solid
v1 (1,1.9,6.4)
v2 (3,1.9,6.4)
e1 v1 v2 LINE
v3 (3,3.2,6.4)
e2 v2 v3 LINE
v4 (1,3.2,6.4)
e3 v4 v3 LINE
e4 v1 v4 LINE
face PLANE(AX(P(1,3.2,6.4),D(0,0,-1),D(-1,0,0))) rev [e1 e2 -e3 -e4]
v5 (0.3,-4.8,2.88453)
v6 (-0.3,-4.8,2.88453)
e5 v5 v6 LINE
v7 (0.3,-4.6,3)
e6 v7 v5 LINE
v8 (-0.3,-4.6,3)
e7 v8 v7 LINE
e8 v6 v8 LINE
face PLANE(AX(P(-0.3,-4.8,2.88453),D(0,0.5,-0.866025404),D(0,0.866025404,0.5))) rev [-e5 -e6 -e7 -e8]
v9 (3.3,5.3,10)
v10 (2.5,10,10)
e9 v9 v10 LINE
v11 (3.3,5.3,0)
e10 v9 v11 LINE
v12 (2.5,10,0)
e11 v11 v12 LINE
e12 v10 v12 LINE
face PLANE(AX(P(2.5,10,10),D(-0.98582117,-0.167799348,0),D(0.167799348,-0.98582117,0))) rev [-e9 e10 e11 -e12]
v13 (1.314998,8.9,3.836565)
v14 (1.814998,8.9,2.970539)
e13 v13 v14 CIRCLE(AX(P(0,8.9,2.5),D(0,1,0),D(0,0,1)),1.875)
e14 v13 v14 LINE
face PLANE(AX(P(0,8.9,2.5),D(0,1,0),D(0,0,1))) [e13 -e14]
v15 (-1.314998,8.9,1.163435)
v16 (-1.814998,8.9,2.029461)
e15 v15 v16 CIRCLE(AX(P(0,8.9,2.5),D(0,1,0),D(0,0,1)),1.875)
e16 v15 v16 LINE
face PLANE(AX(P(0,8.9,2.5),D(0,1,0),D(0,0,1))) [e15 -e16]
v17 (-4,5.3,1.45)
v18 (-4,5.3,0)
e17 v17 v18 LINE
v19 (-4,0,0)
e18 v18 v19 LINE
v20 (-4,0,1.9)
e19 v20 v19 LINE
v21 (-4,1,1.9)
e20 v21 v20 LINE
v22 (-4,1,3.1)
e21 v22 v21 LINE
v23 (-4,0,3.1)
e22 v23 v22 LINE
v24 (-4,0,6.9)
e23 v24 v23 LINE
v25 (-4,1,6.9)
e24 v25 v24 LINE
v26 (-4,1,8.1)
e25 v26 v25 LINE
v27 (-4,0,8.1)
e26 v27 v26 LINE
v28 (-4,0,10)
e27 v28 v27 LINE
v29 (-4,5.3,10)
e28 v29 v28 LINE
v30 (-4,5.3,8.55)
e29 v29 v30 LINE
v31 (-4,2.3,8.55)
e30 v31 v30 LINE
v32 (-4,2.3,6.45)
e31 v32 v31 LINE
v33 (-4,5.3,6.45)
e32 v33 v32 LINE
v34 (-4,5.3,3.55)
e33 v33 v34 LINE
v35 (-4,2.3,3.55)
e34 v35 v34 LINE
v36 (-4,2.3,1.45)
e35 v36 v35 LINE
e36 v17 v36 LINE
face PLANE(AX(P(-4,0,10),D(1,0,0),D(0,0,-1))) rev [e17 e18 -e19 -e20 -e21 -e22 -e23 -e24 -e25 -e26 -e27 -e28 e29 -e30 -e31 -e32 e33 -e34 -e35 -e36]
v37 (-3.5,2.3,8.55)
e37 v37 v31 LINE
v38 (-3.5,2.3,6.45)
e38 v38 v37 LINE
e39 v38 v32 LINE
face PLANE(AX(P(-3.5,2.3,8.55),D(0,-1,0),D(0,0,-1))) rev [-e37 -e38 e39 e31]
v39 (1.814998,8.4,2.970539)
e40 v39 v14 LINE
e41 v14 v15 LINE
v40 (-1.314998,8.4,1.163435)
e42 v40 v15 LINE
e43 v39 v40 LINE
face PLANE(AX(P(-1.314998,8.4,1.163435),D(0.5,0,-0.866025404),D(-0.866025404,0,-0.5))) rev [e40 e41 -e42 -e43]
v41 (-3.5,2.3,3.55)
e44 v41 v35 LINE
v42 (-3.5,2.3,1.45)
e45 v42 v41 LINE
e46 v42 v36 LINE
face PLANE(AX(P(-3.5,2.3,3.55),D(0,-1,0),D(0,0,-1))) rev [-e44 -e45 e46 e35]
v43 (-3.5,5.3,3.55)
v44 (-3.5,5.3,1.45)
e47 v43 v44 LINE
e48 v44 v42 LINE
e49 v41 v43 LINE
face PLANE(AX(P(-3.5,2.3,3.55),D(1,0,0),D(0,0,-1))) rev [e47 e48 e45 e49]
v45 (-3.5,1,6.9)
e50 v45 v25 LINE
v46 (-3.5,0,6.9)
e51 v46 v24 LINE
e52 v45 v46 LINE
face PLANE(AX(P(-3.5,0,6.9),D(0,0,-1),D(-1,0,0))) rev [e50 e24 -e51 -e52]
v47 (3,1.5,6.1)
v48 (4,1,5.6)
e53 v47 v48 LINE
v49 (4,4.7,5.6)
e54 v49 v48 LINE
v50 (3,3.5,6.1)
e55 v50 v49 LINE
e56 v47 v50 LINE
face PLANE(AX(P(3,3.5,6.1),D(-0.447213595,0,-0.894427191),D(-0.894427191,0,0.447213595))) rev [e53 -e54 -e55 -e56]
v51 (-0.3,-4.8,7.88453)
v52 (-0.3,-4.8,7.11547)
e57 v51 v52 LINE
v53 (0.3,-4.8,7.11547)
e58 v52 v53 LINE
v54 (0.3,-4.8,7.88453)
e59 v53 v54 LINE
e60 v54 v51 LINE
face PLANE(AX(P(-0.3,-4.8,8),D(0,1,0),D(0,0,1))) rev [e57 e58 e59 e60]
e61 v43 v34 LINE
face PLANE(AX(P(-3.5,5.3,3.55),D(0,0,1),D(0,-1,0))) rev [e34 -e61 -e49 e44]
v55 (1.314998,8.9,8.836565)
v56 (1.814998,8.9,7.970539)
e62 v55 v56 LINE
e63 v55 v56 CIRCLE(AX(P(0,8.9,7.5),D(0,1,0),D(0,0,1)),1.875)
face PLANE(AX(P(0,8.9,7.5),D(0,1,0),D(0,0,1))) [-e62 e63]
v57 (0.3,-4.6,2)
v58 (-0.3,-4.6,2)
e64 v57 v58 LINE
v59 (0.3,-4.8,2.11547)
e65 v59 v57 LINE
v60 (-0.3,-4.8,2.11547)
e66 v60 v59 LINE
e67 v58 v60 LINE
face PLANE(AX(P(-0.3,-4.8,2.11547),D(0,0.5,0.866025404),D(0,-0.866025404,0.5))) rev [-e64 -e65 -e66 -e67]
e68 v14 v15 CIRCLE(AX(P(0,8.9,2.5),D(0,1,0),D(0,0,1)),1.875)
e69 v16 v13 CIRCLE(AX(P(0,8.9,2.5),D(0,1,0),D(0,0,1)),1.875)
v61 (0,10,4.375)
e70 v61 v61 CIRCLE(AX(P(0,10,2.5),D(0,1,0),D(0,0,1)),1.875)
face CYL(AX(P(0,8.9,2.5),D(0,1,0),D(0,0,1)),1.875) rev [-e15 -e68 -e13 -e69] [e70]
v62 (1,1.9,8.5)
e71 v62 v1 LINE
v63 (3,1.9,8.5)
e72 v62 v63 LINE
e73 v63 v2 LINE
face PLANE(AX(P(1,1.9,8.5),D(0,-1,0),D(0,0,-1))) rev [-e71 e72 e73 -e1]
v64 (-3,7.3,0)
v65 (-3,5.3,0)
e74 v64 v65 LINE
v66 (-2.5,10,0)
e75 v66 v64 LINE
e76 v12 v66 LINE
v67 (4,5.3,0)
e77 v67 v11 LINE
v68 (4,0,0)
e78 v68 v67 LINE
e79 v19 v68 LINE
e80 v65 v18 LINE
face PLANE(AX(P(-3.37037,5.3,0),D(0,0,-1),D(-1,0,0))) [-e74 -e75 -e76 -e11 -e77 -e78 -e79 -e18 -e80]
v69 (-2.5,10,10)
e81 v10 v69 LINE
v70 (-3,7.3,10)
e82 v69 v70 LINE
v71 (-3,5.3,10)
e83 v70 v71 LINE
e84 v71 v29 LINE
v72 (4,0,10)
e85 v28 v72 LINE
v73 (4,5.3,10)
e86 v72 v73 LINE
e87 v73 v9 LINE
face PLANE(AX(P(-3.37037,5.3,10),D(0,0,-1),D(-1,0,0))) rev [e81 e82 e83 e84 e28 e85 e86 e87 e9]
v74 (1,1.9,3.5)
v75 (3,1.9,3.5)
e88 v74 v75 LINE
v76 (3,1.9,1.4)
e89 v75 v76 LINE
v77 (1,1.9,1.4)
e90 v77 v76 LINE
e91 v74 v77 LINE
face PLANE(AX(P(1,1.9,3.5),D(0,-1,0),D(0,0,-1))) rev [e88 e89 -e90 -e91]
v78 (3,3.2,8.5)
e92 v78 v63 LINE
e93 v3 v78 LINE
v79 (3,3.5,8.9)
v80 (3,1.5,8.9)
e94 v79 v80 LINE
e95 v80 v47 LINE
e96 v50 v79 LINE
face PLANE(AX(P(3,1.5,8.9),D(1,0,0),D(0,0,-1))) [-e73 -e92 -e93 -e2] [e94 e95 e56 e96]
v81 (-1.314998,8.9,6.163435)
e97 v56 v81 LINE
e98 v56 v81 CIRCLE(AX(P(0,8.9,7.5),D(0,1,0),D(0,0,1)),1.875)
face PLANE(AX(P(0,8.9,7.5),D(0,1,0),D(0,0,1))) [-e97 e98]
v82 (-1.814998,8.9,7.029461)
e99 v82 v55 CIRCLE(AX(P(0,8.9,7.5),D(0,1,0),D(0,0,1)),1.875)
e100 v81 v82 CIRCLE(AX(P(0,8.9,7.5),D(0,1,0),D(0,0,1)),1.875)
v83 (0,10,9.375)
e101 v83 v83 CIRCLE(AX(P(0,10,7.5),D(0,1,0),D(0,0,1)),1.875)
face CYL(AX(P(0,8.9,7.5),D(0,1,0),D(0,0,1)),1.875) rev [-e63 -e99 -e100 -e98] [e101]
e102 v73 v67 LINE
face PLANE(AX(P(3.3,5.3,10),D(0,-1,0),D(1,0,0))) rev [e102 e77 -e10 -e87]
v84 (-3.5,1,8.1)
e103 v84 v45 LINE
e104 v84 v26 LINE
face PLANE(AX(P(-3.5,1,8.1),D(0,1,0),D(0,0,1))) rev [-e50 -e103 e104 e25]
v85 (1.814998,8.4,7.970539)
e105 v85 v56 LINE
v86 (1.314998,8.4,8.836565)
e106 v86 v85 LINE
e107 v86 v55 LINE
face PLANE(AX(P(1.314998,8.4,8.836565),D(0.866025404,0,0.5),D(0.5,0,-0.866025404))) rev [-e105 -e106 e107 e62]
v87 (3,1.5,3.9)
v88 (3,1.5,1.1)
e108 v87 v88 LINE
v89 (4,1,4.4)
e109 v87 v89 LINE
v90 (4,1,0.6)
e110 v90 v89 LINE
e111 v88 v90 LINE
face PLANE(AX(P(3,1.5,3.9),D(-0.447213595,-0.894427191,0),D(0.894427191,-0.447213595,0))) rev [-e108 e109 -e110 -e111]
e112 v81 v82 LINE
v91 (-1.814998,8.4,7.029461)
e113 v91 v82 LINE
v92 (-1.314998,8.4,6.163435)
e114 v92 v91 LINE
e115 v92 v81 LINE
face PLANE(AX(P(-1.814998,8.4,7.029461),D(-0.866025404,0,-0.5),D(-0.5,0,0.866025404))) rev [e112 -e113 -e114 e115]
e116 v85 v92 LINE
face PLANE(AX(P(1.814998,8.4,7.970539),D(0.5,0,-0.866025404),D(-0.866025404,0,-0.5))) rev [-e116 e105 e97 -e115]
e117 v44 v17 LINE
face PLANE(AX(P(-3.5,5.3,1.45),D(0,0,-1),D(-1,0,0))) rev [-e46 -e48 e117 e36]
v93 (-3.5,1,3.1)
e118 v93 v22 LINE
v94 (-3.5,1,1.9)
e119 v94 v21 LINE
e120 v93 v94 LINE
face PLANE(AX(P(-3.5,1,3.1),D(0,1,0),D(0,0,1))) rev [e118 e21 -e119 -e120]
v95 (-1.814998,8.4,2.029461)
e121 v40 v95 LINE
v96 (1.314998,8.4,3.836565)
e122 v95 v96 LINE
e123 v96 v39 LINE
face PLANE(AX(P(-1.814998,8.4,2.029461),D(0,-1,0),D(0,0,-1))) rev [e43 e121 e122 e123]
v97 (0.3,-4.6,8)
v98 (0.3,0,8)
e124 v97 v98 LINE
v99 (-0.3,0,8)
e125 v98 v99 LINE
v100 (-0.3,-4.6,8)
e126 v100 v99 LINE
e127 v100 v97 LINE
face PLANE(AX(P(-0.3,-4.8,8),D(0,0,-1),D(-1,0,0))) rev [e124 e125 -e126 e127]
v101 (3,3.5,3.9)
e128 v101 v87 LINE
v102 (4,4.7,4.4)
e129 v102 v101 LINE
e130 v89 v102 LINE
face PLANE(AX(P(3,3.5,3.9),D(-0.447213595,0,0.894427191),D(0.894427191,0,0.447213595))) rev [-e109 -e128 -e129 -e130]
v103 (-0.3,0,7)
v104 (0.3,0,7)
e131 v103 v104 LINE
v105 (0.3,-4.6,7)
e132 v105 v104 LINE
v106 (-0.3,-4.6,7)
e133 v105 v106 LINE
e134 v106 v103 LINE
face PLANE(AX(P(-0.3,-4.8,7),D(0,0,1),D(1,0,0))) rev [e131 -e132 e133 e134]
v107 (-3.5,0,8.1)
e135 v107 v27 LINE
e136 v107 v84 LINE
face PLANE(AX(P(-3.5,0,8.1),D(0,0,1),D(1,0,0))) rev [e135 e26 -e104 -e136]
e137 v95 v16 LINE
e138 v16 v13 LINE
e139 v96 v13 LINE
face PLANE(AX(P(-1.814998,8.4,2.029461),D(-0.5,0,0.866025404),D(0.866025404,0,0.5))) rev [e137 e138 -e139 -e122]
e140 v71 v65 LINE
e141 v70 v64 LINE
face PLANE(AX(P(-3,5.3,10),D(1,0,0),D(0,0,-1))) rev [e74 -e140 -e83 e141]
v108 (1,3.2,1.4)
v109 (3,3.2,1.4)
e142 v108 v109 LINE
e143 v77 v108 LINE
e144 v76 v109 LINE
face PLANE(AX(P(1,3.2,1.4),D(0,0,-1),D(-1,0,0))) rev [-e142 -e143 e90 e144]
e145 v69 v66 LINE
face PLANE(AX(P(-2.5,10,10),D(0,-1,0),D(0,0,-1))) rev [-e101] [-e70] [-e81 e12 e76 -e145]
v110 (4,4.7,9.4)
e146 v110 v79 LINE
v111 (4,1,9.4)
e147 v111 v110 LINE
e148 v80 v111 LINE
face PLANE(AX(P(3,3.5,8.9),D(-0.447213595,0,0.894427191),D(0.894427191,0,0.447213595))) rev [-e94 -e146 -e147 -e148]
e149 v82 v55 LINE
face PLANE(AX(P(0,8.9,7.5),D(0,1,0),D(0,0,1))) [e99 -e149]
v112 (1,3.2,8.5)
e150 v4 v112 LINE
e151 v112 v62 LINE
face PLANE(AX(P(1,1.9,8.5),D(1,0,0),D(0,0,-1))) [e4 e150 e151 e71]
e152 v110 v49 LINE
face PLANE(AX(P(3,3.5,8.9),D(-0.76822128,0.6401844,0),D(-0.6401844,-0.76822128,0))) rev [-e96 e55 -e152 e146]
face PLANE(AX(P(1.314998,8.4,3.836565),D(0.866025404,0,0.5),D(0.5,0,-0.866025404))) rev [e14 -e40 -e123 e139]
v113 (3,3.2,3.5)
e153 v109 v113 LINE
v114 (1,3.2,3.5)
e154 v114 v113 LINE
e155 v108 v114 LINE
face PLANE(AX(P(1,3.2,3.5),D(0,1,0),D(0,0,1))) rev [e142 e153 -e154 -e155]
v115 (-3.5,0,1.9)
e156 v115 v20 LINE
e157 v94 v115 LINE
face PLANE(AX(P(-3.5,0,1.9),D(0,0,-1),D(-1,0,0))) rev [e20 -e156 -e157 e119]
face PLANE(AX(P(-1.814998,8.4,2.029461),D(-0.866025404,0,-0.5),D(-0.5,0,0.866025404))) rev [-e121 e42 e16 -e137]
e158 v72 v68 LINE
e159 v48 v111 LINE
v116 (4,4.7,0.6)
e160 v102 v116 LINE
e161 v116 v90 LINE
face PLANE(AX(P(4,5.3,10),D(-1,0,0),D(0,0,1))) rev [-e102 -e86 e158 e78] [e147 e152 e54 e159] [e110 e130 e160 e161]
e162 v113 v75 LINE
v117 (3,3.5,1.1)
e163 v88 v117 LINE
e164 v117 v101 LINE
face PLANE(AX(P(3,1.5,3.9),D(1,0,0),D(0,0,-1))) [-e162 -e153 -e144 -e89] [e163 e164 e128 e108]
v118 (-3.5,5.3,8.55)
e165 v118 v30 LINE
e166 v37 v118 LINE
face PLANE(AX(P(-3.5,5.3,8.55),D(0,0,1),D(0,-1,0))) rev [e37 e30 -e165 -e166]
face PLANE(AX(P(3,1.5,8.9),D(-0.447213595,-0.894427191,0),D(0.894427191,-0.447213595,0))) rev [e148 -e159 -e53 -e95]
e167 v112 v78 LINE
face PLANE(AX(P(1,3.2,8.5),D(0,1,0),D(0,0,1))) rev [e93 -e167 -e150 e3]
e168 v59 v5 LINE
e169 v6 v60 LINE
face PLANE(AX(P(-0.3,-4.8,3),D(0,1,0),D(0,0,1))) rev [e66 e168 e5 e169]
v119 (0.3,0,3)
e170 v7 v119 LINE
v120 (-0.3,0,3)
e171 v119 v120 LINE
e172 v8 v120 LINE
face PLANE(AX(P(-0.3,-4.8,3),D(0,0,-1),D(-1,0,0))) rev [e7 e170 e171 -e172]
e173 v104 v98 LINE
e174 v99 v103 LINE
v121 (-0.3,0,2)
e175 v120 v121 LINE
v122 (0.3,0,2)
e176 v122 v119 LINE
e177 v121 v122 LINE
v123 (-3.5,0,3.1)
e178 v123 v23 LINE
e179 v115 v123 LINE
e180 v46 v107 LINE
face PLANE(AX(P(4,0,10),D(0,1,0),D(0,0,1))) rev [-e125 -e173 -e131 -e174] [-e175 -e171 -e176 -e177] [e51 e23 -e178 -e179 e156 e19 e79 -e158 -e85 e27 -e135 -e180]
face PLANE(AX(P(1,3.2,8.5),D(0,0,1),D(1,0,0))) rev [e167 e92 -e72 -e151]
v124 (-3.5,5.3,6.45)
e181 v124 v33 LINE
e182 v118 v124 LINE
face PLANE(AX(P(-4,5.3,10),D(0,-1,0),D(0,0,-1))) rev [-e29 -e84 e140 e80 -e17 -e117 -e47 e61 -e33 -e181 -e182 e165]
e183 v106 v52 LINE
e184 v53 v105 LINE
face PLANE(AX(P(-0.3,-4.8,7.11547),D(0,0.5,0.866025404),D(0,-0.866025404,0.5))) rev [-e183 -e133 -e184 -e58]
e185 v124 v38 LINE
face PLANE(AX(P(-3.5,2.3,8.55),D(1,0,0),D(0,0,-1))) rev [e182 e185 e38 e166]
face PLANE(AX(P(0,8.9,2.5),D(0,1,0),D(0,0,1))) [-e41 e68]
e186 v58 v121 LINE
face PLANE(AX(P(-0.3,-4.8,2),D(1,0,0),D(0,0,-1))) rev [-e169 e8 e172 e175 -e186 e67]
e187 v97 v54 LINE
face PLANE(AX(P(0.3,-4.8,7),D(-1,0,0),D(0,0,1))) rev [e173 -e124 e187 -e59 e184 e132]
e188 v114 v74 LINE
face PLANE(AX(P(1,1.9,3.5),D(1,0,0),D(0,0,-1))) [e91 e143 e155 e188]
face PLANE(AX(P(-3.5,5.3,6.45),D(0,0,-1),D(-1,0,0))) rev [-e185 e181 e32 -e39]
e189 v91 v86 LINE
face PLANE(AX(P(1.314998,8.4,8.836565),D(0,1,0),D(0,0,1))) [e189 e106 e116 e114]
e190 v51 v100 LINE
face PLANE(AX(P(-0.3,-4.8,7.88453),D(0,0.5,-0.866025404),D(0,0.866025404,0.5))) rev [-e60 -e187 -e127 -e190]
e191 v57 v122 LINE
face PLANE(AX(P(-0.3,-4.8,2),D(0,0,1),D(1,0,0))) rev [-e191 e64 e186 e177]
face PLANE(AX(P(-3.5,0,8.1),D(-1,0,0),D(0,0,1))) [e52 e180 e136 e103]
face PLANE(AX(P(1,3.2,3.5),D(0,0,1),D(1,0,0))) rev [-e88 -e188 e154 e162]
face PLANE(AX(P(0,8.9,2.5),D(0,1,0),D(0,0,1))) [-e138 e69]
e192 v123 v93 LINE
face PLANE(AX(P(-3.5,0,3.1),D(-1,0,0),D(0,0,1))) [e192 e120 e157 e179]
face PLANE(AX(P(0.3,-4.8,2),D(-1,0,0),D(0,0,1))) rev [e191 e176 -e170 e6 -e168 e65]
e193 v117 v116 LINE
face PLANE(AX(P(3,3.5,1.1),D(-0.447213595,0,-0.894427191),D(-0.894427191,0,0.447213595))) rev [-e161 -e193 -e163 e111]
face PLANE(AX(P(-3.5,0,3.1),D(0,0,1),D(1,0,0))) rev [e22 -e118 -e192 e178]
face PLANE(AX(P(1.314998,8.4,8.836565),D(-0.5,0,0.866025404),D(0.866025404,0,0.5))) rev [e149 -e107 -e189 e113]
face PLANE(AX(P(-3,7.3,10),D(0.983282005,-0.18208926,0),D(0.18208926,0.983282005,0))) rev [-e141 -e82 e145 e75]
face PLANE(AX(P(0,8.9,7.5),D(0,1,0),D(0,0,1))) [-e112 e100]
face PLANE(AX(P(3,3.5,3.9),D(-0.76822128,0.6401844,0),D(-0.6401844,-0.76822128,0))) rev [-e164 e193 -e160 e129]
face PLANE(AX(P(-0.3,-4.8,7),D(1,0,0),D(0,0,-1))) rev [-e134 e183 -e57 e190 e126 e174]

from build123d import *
from OCP.BRepFilletAPI import BRepFilletAPI_MakeChamfer

# Parameters (mm, degrees)
Z_KLAD_PROTA_EN_DEPTH    = 10
SKICA2_R                 = 1.875
ODEBR_N_PROTA_EN_1_DEPTH = 1.1
ODEBR_N_PROTA_EN_2_DEPTH = 0.5
SKICA4_W                 = 2.1
SKICA4_H                 = 3
SKICA4_W_2               = 1.2
SKICA4_H_2               = 1
ODEBR_N_PROTA_EN_3_DEPTH = 0.5
SKICA5_W                 = 2.8
SKICA5_H                 = 2
ODEBR_N_PROTA_EN_4_DEPTH = 1
LINE_RN_POLE1_COUNT      = 3
LINE_RN_POLE1_PITCH      = 5
ZKOSEN_1_SIZE            = 1.2
ZKOSEN_1_SIZE_2          = 1
ZKOSEN_2_SIZE            = 0.5
ZKOSEN_2_SIZE_2          = 1
SKICA6_W                 = 2.1
SKICA6_H                 = 1.3
ODEBR_N_PROTA_EN_5_DEPTH = 2
LINE_RN_POLE2_COUNT      = 3
LINE_RN_POLE2_PITCH      = 5
SKICA7_W                 = 0.6
SKICA7_H                 = 1
P_ID_N_PROTA_EN_1_DEPTH  = 4.8
LINE_RN_POLE3_COUNT      = 2
LINE_RN_POLE3_PITCH      = 5
ZKOSEN_3_SIZE            = 0.2
ZKOSEN_3_SIZE2           = 0.115470054


# Some blends are built 0.0001 mm under size
with BuildPart() as part:
    # Skica1 → Základ-Protažení (new body)
    with BuildSketch(Plane.XY):
        Polygon((-2.5, 10), (2.5, 10), (3.3, 5.3), (4, 5.3), (4, 0), (-4, 0), (-4, 5.3), (-3, 5.3), (-3, 7.3), align=None)
    extrude(amount=Z_KLAD_PROTA_EN_DEPTH)

    # Skica2 → Odebrání-Protažení1 (cut)
    with BuildSketch(Plane(origin=(0, 10, 0), x_dir=(-1, 0, 0), z_dir=(0, 1, 0))):
        with Locations(Location((0, 2.5, 0), (0, 0, 90))):
            Circle(SKICA2_R)
        with Locations(Location((0, 7.5, 0), (0, 0, 90))):
            Circle(SKICA2_R)
    extrude(amount=-ODEBR_N_PROTA_EN_1_DEPTH, mode=Mode.SUBTRACT)

    # Skica3 → Odebrání-Protažení2 (cut)
    with BuildSketch(Plane(origin=(0, 8.9, 0), x_dir=(-1, 0, 0), z_dir=(0, 1, 0))):
        Polygon((1.814998003, 2.029460683), (-1.314998003, 3.83656472), (-1.814998003, 2.970539317), (1.314998003, 1.16343528), align=None)
        Polygon((-1.314998003, 8.83656472), (1.814998003, 7.029460683), (1.314998003, 6.16343528), (-1.814998003, 7.970539317), align=None)
    extrude(amount=-ODEBR_N_PROTA_EN_2_DEPTH, mode=Mode.SUBTRACT)

    # Skica4 → Odebrání-Protažení3 (cut)
    with BuildSketch(Plane.ZY.offset(4)):
        with Locations((7.5, 3.8)):
            Rectangle(SKICA4_W, SKICA4_H)
        with Locations((7.5, 0.5)):
            Rectangle(SKICA4_W_2, SKICA4_H_2)
        with Locations((2.5, 3.8)):
            Rectangle(SKICA4_W, SKICA4_H)
        with Locations((2.5, 0.5)):
            Rectangle(SKICA4_W_2, SKICA4_H_2)
        with Locations((-2.5, 3.8)):
            Rectangle(SKICA4_W, SKICA4_H)
        with Locations((-2.5, 0.5)):
            Rectangle(SKICA4_W_2, SKICA4_H_2)
    extrude(amount=-ODEBR_N_PROTA_EN_3_DEPTH, mode=Mode.SUBTRACT)

    # Skica5 → Odebrání-Protažení4 (cut)
    with BuildSketch(Plane(origin=(4, 0, 0), x_dir=(0, 0, -1), z_dir=(1, 0, 0))):
        with Locations((-7.5, 2.5)):
            Rectangle(SKICA5_W, SKICA5_H)
    odebr_n_prota_en_4 = extrude(amount=-ODEBR_N_PROTA_EN_4_DEPTH, mode=Mode.SUBTRACT)

    # Lineární Pole1: Odebrání-Protažení4 ×3
    with Locations(*[(0, 0, -i * LINE_RN_POLE1_PITCH) for i in range(1, LINE_RN_POLE1_COUNT)]):
        add(odebr_n_prota_en_4, mode=Mode.SUBTRACT)

    # Zkosení1
    # the kernel refuses this chamfer: 1.2, 1 mm, written as the material it adds along each edge
    # the kernel refuses this chamfer: 1.2, 1 mm, written as the material it takes off along each edge
    with BuildSketch(Plane(origin=(4, 3.5, 8.9), x_dir=(0.024836286378920516, 0.9996915318631564, 0), z_dir=(0, 0, -1)), Plane(origin=(4, 3.5, 3.9), x_dir=(0.024836286378920516, 0.9996915318631564, 0), z_dir=(0, 0, -1))) as zkosen_1_2_piece_1:
        Polygon((ZKOSEN_1_SIZE * 0.999691531863, -ZKOSEN_1_SIZE * 0.0248362863789), (-ZKOSEN_1_SIZE_2 * 0.0248362863789, -ZKOSEN_1_SIZE_2 * 0.999691531863), (0, 0), align=None)
    extrude(amount=2.8, mode=Mode.SUBTRACT)
    with BuildSketch(Plane(origin=(4, 3.5, 11.993140689), x_dir=(0.024836286378920505, 0.9996915318631564, 0), z_dir=(0, 0, -1))) as zkosen_1_2_piece_2_section:
        Polygon((ZKOSEN_1_SIZE * 0.999691531863, -ZKOSEN_1_SIZE * 0.0248362863789), (-ZKOSEN_1_SIZE_2 * 0.0248362863789, -ZKOSEN_1_SIZE_2 * 0.999691531863), (0, 0), align=None)
    zkosen_1_2_piece_2 = extrude(amount=8.986281378, mode=Mode.PRIVATE)
    zkosen_1_2_piece_2 = split(zkosen_1_2_piece_2, bisect_by=Plane(origin=(3.666666667, 3.9, 3.9), z_dir=(0, 0, -1)), keep=Keep.TOP, mode=Mode.PRIVATE)
    add(zkosen_1_2_piece_2, mode=Mode.SUBTRACT)
    with BuildSketch(Plane(origin=(4, 3.5, 6.993140689), x_dir=(0.024836286378920505, 0.9996915318631564, 0), z_dir=(0, 0, -1))) as zkosen_1_2_piece_3_section:
        Polygon((ZKOSEN_1_SIZE * 0.999691531863, -ZKOSEN_1_SIZE * 0.0248362863789), (-ZKOSEN_1_SIZE_2 * 0.0248362863789, -ZKOSEN_1_SIZE_2 * 0.999691531863), (0, 0), align=None)
    zkosen_1_2_piece_3 = extrude(amount=8.986281378, mode=Mode.PRIVATE)
    zkosen_1_2_piece_3 = split(zkosen_1_2_piece_3, bisect_by=Plane(origin=(3.666666667, 3.9, 6.1), z_dir=(0, 0, 1)), keep=Keep.TOP, mode=Mode.PRIVATE)
    add(zkosen_1_2_piece_3, mode=Mode.SUBTRACT)

    # Zkosení2
    zkosen_2_edges_1 = [part.edges().sort_by_distance(p)[0] for p in [
        (4, 3.1, 8.9),
    ]]
    zkosen_2_side_1 = [part.faces().sort_by_distance(p)[0] for p in [
        (4, 3.1, 8.91),
    ]]
    zkosen_2_edges_2 = [part.edges().sort_by_distance(p)[0] for p in [
        (4, 1.5, 7.5),
    ]]
    zkosen_2_side_2 = [part.faces().sort_by_distance(p)[0] for p in [
        (4, 1.49, 7.5),
    ]]
    zkosen_2_edges_3 = [part.edges().sort_by_distance(p)[0] for p in [
        (4, 3.1, 6.1),
    ]]
    zkosen_2_side_3 = [part.faces().sort_by_distance(p)[0] for p in [
        (4, 3.1, 6.09),
    ]]
    zkosen_2_edges_4 = [part.edges().sort_by_distance(p)[0] for p in [
        (4, 3.1, 3.9),
    ]]
    zkosen_2_side_4 = [part.faces().sort_by_distance(p)[0] for p in [
        (4, 3.1, 3.91),
    ]]
    zkosen_2_edges_5 = [part.edges().sort_by_distance(p)[0] for p in [
        (4, 1.5, 2.5),
    ]]
    zkosen_2_side_5 = [part.faces().sort_by_distance(p)[0] for p in [
        (4, 1.49, 2.5),
    ]]
    zkosen_2_edges_6 = [part.edges().sort_by_distance(p)[0] for p in [
        (4, 3.1, 1.1),
    ]]
    zkosen_2_side_6 = [part.faces().sort_by_distance(p)[0] for p in [
        (4, 3.1, 1.09),
    ]]
    zkosen_2 = BRepFilletAPI_MakeChamfer(part.part.solid().wrapped)
    for e in zkosen_2_edges_1:
        zkosen_2.Add(ZKOSEN_2_SIZE - 0.0001, ZKOSEN_2_SIZE_2 - 0.0001, e.wrapped, zkosen_2_side_1[0].wrapped)
    for e in zkosen_2_edges_2:
        zkosen_2.Add(ZKOSEN_2_SIZE - 0.0001, ZKOSEN_2_SIZE_2 - 0.0001, e.wrapped, zkosen_2_side_2[0].wrapped)
    for e in zkosen_2_edges_3:
        zkosen_2.Add(ZKOSEN_2_SIZE - 0.0001, ZKOSEN_2_SIZE_2 - 0.0001, e.wrapped, zkosen_2_side_3[0].wrapped)
    for e in zkosen_2_edges_4:
        zkosen_2.Add(ZKOSEN_2_SIZE - 0.0001, ZKOSEN_2_SIZE_2 - 0.0001, e.wrapped, zkosen_2_side_4[0].wrapped)
    for e in zkosen_2_edges_5:
        zkosen_2.Add(ZKOSEN_2_SIZE - 0.0001, ZKOSEN_2_SIZE_2 - 0.0001, e.wrapped, zkosen_2_side_5[0].wrapped)
    for e in zkosen_2_edges_6:
        zkosen_2.Add(ZKOSEN_2_SIZE - 0.0001, ZKOSEN_2_SIZE_2 - 0.0001, e.wrapped, zkosen_2_side_6[0].wrapped)
    add(Compound.cast(zkosen_2.Shape()), mode=Mode.REPLACE)  # a hair under: the kernel refuses the full size

    # Skica6 → Odebrání-Protažení5 (cut)
    with BuildSketch(Plane(origin=(3, 0, 0), x_dir=(0, 0, -1), z_dir=(1, 0, 0))):
        with Locations((-7.45, 2.55)):
            Rectangle(SKICA6_W, SKICA6_H)
    odebr_n_prota_en_5 = extrude(amount=-ODEBR_N_PROTA_EN_5_DEPTH, mode=Mode.SUBTRACT)

    # Lineární Pole2: Odebrání-Protažení5 ×3
    with Locations(*[(0, 0, -i * LINE_RN_POLE2_PITCH) for i in range(1, LINE_RN_POLE2_COUNT)]):
        add(odebr_n_prota_en_5, mode=Mode.SUBTRACT)

    # Skica7 → Přidání-Protažení1 (add)
    with BuildSketch(Plane.XZ):
        with Locations((0, 2.5)):
            Rectangle(SKICA7_W, SKICA7_H)
    p_id_n_prota_en_1 = extrude(amount=P_ID_N_PROTA_EN_1_DEPTH)

    # Lineární Pole3: Přidání-Protažení1 ×2
    with Locations(*[(0, 0, i * LINE_RN_POLE3_PITCH) for i in range(1, LINE_RN_POLE3_COUNT)]):
        add(p_id_n_prota_en_1)

    # Zkosení3: one chamfer whose edges measure the first distance from different faces: ONE call of the kernel's chamfer builder (chamfer() names one face for all edges)
    zkosen_3_edges_1 = [part.edges().sort_by_distance(p)[0] for p in [
        (0, -4.8, 2),
    ]]
    zkosen_3_side_1 = [part.faces().sort_by_distance(p)[0] for p in [
        (0, -2.4, 2),
    ]]
    zkosen_3_edges_2 = [part.edges().sort_by_distance(p)[0] for p in [
        (0, -4.8, 3),
    ]]
    zkosen_3_side_2 = [part.faces().sort_by_distance(p)[0] for p in [
        (0, -2.4, 3),
    ]]
    zkosen_3_edges_3 = [part.edges().sort_by_distance(p)[0] for p in [
        (0, -4.8, 7),
    ]]
    zkosen_3_side_3 = [part.faces().sort_by_distance(p)[0] for p in [
        (0, -2.4, 7),
    ]]
    zkosen_3_edges_4 = [part.edges().sort_by_distance(p)[0] for p in [
        (0, -4.8, 8),
    ]]
    zkosen_3_side_4 = [part.faces().sort_by_distance(p)[0] for p in [
        (0, -2.4, 8),
    ]]
    zkosen_3 = BRepFilletAPI_MakeChamfer(part.part.solid().wrapped)
    for e in zkosen_3_edges_1:
        zkosen_3.Add(ZKOSEN_3_SIZE, ZKOSEN_3_SIZE2, e.wrapped, zkosen_3_side_1[0].wrapped)  # the first distance lies on this face
    for e in zkosen_3_edges_2:
        zkosen_3.Add(ZKOSEN_3_SIZE, ZKOSEN_3_SIZE2, e.wrapped, zkosen_3_side_2[0].wrapped)  # the first distance lies on this face
    for e in zkosen_3_edges_3:
        zkosen_3.Add(ZKOSEN_3_SIZE, ZKOSEN_3_SIZE2, e.wrapped, zkosen_3_side_3[0].wrapped)  # the first distance lies on this face
    for e in zkosen_3_edges_4:
        zkosen_3.Add(ZKOSEN_3_SIZE, ZKOSEN_3_SIZE2, e.wrapped, zkosen_3_side_4[0].wrapped)  # the first distance lies on this face
    add(Compound.cast(zkosen_3.Shape()), mode=Mode.REPLACE)


solid = part.part
